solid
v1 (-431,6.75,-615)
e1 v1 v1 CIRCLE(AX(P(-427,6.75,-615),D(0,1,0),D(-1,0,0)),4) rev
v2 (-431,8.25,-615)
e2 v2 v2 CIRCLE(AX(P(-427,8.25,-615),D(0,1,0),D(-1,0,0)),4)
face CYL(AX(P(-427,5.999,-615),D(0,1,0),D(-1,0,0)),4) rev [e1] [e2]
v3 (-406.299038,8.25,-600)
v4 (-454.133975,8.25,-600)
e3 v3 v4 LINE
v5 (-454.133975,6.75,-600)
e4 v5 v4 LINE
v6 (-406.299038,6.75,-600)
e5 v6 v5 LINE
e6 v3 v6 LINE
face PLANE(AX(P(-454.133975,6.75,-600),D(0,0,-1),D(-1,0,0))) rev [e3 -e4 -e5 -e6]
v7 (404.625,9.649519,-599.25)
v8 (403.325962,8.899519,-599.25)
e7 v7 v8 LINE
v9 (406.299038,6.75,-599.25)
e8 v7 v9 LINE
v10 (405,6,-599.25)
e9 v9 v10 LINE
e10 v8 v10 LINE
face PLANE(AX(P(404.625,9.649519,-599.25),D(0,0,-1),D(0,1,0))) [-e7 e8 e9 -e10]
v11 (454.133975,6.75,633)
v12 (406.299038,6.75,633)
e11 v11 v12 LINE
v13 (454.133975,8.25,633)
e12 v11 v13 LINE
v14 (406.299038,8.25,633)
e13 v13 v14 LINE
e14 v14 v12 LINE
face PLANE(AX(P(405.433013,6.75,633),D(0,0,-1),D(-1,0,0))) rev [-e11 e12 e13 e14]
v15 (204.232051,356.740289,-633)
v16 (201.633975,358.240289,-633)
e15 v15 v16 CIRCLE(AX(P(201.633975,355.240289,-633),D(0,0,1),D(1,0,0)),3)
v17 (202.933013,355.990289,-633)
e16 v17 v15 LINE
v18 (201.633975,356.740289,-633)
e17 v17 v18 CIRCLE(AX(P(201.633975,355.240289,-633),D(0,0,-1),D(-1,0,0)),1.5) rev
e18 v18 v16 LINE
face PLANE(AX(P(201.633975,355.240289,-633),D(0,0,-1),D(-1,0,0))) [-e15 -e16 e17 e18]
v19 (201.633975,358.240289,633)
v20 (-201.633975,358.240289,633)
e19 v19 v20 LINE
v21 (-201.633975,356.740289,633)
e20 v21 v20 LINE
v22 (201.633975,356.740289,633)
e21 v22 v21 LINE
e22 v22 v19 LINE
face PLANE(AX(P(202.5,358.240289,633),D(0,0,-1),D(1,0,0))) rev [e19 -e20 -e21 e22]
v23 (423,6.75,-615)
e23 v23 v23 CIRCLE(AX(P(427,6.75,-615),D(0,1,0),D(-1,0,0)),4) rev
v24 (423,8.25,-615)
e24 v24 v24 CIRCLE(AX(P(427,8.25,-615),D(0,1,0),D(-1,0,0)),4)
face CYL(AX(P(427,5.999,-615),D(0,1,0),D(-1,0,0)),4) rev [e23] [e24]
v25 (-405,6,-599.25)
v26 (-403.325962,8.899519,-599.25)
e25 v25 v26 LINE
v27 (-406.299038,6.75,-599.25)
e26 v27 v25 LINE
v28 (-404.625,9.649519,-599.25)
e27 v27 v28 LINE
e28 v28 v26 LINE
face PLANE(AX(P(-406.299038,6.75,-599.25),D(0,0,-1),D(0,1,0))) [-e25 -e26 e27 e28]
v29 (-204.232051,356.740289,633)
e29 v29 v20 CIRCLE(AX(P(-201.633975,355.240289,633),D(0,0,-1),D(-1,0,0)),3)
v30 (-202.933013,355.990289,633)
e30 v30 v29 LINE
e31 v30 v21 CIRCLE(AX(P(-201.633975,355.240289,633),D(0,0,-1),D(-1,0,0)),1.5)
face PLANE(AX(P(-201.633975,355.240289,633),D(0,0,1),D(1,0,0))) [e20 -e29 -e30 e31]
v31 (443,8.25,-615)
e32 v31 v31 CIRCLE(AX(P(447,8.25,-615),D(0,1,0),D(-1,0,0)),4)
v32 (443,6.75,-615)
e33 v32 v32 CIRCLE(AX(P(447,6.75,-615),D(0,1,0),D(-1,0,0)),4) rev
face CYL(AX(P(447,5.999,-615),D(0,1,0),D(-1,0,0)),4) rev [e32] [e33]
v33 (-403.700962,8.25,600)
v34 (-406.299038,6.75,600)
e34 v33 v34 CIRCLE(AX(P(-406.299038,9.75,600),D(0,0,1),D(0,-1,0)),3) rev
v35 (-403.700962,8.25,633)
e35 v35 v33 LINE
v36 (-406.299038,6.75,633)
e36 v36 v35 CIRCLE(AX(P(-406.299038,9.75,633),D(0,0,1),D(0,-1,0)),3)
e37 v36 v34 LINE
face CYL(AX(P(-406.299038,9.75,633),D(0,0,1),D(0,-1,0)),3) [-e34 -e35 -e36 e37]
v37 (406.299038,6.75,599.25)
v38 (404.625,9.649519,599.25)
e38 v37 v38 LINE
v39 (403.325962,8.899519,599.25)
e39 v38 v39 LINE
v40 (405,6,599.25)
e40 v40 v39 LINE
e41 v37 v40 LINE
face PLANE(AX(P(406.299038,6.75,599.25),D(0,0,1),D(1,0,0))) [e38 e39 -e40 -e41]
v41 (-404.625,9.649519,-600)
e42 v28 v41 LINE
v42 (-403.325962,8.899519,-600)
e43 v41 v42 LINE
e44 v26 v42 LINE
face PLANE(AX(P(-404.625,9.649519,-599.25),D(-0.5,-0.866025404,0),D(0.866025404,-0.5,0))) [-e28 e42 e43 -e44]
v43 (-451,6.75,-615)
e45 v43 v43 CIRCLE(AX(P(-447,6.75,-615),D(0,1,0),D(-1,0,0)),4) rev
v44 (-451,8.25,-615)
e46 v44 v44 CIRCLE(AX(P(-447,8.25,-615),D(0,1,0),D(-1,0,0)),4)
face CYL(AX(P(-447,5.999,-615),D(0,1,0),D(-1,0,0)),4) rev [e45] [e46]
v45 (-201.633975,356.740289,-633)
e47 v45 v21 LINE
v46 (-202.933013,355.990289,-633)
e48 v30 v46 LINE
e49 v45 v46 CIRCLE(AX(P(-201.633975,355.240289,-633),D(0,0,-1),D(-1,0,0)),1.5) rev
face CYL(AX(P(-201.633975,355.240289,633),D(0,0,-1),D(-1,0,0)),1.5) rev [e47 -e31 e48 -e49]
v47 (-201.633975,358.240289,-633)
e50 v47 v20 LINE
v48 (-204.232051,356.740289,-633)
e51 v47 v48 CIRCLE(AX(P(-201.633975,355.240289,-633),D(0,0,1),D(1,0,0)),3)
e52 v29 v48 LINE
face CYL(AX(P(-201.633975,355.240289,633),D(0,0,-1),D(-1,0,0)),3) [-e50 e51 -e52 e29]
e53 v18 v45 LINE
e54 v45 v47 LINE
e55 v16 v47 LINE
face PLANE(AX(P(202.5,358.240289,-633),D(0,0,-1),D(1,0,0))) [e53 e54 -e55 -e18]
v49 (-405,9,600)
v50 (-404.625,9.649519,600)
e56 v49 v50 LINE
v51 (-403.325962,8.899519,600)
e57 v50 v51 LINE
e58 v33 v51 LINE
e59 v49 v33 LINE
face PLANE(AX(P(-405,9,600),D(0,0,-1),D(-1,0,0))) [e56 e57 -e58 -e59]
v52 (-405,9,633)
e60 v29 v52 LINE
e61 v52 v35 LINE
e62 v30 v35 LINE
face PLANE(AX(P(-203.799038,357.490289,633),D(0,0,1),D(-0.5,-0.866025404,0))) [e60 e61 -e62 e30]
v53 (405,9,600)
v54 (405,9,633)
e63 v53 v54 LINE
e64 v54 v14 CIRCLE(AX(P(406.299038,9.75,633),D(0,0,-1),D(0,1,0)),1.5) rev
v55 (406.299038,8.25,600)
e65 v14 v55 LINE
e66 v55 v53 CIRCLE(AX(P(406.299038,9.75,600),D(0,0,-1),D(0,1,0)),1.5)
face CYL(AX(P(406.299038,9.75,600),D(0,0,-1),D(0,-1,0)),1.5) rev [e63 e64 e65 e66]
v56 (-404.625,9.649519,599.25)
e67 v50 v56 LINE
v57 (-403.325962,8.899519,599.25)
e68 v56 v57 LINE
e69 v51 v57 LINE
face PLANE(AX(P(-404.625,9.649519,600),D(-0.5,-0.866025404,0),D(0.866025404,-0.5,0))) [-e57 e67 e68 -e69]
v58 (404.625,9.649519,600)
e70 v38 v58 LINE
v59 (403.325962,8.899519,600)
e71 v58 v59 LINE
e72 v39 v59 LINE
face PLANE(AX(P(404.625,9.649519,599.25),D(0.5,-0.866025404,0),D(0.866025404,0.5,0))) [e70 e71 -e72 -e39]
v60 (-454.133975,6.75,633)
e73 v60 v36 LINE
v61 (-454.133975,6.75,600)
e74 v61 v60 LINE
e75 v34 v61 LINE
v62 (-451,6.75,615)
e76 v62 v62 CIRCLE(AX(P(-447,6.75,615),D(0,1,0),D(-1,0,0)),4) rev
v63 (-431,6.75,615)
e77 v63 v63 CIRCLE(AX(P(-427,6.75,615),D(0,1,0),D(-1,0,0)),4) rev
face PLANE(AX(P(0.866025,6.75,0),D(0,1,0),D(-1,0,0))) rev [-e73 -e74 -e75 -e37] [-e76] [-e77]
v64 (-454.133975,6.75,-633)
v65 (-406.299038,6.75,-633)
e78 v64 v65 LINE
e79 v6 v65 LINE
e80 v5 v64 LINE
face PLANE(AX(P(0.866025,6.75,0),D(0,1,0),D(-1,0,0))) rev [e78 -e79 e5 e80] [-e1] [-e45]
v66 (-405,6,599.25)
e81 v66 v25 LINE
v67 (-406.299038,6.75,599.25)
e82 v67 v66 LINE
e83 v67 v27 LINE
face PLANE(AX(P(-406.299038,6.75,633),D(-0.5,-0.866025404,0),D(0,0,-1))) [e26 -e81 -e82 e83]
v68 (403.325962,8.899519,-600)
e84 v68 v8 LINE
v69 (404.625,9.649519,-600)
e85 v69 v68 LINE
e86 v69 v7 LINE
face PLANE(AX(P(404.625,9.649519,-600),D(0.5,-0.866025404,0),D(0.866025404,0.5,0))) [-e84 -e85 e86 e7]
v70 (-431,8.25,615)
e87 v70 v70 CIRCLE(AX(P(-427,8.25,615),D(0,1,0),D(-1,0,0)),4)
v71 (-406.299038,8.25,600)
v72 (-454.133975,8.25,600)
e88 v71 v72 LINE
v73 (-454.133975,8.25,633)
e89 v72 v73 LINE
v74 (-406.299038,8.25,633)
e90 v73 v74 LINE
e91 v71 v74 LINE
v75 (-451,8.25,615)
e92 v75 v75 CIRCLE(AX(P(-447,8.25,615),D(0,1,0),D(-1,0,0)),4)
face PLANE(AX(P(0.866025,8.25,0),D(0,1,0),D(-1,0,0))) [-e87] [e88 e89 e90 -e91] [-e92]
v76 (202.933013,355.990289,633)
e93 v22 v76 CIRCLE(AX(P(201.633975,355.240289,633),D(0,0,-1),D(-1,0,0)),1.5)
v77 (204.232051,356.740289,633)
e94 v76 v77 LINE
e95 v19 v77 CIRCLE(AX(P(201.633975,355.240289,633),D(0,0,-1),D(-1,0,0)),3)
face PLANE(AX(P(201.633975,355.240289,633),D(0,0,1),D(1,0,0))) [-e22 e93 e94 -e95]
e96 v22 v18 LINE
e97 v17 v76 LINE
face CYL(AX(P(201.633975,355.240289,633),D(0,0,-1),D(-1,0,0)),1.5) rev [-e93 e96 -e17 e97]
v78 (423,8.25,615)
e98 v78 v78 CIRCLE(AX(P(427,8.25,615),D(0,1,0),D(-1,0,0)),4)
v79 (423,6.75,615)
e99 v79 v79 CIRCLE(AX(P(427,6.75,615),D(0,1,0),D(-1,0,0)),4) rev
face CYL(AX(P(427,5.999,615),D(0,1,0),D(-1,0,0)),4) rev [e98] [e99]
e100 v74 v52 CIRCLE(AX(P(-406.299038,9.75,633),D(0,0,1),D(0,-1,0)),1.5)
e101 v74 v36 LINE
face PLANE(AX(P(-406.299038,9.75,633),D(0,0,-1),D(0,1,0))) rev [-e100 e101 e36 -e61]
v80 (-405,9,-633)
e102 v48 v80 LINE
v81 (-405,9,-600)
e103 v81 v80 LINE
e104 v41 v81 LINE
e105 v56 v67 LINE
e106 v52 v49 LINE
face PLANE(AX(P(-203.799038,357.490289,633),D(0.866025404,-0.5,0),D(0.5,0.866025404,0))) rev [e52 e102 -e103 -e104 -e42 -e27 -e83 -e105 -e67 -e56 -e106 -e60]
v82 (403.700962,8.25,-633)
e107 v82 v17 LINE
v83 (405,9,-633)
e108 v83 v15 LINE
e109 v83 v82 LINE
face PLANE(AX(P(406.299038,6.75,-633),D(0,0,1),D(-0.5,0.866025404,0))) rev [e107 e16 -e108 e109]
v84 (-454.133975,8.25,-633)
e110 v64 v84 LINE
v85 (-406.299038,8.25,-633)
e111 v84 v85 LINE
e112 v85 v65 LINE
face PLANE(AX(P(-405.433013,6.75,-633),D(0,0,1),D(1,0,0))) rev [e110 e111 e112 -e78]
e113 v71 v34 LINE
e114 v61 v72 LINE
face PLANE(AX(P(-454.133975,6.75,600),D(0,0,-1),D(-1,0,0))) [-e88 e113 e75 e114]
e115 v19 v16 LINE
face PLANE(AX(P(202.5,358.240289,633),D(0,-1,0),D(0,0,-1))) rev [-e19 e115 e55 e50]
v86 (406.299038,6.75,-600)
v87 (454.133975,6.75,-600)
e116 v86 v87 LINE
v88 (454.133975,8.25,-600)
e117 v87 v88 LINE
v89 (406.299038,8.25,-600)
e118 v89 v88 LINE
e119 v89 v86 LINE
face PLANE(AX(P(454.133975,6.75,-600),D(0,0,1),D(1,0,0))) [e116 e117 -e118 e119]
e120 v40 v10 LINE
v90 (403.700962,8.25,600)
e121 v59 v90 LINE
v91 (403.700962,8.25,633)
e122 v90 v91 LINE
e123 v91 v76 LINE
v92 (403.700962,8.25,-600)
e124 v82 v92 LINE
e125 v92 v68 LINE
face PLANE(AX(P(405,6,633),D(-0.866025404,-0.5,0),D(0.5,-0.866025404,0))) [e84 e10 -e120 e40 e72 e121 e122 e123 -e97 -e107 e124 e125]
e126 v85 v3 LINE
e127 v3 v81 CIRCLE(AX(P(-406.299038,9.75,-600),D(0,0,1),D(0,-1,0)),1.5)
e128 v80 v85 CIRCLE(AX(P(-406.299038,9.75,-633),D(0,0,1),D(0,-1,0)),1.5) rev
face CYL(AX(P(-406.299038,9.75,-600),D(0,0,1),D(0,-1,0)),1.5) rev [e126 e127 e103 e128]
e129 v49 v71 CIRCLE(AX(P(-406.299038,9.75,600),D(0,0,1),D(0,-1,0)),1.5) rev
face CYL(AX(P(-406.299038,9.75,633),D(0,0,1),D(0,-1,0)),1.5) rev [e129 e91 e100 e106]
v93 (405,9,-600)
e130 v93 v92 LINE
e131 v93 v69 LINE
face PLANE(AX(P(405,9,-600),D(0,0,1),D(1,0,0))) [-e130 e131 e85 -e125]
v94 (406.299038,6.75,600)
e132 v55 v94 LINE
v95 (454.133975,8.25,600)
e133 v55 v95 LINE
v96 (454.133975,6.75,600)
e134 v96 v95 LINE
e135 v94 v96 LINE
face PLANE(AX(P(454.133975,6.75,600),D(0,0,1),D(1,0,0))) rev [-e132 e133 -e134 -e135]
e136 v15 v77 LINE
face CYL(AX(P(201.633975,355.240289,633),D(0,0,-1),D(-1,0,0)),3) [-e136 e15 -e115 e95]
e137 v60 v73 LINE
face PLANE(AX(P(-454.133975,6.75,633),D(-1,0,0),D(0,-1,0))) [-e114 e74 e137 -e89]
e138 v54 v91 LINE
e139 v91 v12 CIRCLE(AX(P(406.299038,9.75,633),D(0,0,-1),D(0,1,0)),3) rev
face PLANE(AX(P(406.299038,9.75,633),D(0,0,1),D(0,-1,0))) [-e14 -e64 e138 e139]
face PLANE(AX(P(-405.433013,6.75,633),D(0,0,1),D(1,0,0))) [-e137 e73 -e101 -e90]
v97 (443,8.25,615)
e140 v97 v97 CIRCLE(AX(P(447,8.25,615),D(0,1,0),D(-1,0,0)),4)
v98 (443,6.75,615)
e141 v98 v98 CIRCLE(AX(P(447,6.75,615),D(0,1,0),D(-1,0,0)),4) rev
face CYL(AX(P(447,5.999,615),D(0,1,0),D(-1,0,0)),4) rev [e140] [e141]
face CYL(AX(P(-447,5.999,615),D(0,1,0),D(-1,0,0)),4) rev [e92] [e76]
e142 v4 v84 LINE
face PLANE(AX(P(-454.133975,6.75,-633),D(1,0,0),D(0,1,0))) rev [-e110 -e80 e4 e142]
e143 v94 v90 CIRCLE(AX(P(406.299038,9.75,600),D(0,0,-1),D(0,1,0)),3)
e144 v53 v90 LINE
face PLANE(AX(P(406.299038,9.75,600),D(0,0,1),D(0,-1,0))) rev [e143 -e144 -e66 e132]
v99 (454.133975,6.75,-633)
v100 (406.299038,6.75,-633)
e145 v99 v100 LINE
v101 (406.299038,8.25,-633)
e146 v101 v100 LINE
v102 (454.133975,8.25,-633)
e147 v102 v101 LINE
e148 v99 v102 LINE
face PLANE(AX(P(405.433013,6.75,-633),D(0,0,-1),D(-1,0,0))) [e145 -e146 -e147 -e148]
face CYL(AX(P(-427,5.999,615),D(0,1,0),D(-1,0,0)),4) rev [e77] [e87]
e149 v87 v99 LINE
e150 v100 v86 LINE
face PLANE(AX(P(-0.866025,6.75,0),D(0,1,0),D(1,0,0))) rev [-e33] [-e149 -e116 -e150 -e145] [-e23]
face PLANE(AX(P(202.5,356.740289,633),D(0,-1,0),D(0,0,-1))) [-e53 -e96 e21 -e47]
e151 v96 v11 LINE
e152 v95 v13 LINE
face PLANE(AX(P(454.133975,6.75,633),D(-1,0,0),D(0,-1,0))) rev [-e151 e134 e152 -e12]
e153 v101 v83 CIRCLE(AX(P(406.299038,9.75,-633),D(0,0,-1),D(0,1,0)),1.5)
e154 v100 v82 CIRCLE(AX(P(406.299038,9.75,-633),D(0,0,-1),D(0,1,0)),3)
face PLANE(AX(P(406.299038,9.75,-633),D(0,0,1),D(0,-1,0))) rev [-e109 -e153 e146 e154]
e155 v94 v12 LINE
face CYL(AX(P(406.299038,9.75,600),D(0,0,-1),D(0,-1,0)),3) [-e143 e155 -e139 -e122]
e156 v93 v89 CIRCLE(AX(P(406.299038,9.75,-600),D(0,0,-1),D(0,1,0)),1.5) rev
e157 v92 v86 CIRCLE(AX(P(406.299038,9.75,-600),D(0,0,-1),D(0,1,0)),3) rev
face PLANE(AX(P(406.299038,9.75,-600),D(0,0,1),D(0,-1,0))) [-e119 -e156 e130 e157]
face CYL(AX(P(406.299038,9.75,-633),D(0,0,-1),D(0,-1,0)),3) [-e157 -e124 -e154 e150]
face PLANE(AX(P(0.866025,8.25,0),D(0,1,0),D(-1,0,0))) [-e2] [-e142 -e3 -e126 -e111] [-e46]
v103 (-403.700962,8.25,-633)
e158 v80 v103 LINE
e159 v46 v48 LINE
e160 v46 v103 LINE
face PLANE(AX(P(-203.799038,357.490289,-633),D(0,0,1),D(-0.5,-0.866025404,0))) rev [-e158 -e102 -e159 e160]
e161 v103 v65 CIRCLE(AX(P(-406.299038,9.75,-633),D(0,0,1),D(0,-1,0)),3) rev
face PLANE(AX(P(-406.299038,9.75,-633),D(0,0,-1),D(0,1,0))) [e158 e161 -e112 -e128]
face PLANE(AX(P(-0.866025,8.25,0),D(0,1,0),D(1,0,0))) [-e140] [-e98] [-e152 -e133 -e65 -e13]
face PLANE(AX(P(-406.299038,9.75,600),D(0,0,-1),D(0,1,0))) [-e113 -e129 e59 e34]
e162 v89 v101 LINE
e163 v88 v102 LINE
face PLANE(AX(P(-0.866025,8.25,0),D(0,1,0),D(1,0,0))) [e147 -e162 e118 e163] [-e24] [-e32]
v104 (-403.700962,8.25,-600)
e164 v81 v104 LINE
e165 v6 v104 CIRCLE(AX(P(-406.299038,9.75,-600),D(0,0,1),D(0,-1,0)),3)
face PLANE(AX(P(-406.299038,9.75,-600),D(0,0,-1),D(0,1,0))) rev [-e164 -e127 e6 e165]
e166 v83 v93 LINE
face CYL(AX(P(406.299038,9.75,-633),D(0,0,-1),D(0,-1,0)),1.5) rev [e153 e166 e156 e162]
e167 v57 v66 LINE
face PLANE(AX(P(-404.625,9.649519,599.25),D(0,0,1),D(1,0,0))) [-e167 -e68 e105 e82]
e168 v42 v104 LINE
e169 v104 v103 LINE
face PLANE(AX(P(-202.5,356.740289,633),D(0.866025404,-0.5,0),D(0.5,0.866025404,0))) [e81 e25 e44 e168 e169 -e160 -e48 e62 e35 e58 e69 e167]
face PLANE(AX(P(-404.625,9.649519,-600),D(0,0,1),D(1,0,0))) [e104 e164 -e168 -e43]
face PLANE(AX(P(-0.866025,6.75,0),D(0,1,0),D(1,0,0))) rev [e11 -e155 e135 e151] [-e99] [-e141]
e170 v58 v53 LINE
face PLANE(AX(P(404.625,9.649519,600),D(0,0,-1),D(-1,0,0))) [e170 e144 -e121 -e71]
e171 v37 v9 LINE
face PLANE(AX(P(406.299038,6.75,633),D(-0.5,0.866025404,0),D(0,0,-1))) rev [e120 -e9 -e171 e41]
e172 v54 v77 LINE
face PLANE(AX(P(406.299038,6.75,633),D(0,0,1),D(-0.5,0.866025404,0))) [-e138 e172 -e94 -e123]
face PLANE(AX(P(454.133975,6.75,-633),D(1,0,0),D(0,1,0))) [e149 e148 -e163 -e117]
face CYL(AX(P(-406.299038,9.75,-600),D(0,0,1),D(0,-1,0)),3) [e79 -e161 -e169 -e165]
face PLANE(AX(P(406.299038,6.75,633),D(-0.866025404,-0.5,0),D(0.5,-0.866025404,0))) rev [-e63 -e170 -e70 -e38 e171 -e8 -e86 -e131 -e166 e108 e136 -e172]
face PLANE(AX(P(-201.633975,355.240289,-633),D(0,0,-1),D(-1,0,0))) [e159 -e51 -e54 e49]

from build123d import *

# Parameters (mm, degrees)
EXTRUDE_1_DEPTH          = 633
EXTRUDE_1_DEPTH_BACK     = 633
SHEET_START              = -633
SHEET_METAL_1_DEPTH      = 1266
SHEET_METAL_1_2_DEPTH    = 1266
SM_START                 = -633
SM_EDGE_FLANGE_1_DEPTH   = 33.75
SM_START_2               = -600
SM_EDGE_FLANGE_1_2_DEPTH = 0.75
SM_EDGE_FLANGE_1_3_DEPTH = 33
MIRROR_START             = -633
MIRROR_2_COPY_1_DEPTH    = 33.75
MIRROR_START_2           = -600
MIRROR_2_COPY_2_DEPTH    = 0.75
MIRROR_2_COPY_3_DEPTH    = 33
MIRROR_2_COPY_4_DEPTH    = 0.75
MIRROR_2_COPY_5_DEPTH    = 33
CUT_EXTRUDE_1_REACH      = 856.061
SKETCH_9_R               = 4


# Read off the part's stored shape, not the designer's step: Преобразовать-Твердое тело1, Ребро-кромка1
with BuildPart() as part:
    # Sketch 1 → Вытянуть-Тонкостенный1 (new, two sides: drawn at the far end of the back side and taken through both)
    with BuildSketch(Plane.XY.offset(-EXTRUDE_1_DEPTH_BACK)):
        Polygon((405, 6), (202.5, 356.740288533), (-202.5, 356.740288533), (-405, 6), (-406.299038106, 6.75), (-203.366025404, 358.240288533), (203.366025404, 358.240288533), (406.299038106, 6.75), align=None)
    extrude(amount=EXTRUDE_1_DEPTH + EXTRUDE_1_DEPTH_BACK)

    # Sheet Metal 1 outline → Sheet Metal 1 (cut)
    with BuildSketch(Plane.XY.offset(SHEET_START)):
        with BuildLine():
            Line((203.366025404, 358.240288533), (201.633974596, 358.240288533))
            ThreePointArc((201.633974596, 358.240288533), (203.133974596, 357.838364744), (204.232050808, 356.740288533))
            Line((204.232050808, 356.740288533), (203.366025404, 358.240288533))
        make_face()
        with BuildLine():
            ThreePointArc((-204.232050808, 356.740288533), (-203.133974596, 357.838364744), (-201.633974596, 358.240288533))
            Line((-201.633974596, 358.240288533), (-203.366025404, 358.240288533))
            Line((-203.366025404, 358.240288533), (-204.232050808, 356.740288533))
        make_face()
    extrude(amount=SHEET_METAL_1_DEPTH, mode=Mode.SUBTRACT)

    # Sheet Metal 1 2 outline → Sheet Metal 1 2 (add)
    with BuildSketch(Plane.XY.offset(SHEET_START)):
        with BuildLine():
            Line((202.5, 356.740288533), (201.633974596, 356.740288533))
            ThreePointArc((201.633974596, 356.740288533), (202.383974596, 356.539326638), (202.933012702, 355.990288533))
            Line((202.933012702, 355.990288533), (202.5, 356.740288533))
        make_face()
        with BuildLine():
            ThreePointArc((-202.933012702, 355.990288533), (-202.383974596, 356.539326638), (-201.633974596, 356.740288533))
            Line((-201.633974596, 356.740288533), (-202.5, 356.740288533))
            Line((-202.5, 356.740288533), (-202.933012702, 355.990288533))
        make_face()
    extrude(amount=SHEET_METAL_1_2_DEPTH)

    # Ребро-кромка1 outline → Ребро-кромка1 (cut)
    with BuildSketch(Plane.XY.offset(SM_START)):
        with BuildLine():
            Line((-405, 6), (-403.700961894, 8.25))
            ThreePointArc((-403.700961894, 8.25), (-404.799038106, 7.151923789), (-406.299038106, 6.75))
            Line((-406.299038106, 6.75), (-405, 6))
        make_face()
    sm_edge_flange_1 = extrude(amount=SM_EDGE_FLANGE_1_DEPTH, mode=Mode.SUBTRACT)

    # Sm Edge Flange 1 2 outline → Sm Edge Flange 1 2 (cut)
    with BuildSketch(Plane.XY.offset(SM_START_2)):
        with BuildLine():
            Line((-403.325961894, 8.899519053), (-404.625, 9.649519053))
            Line((-404.625, 9.649519053), (-406.299038106, 6.75))
            ThreePointArc((-406.299038106, 6.75), (-404.799038106, 7.151923789), (-403.700961894, 8.25))
            Line((-403.700961894, 8.25), (-403.325961894, 8.899519053))
        make_face()
    sm_edge_flange_1_2 = extrude(amount=SM_EDGE_FLANGE_1_2_DEPTH, mode=Mode.SUBTRACT)

    # Sm Edge Flange 1 3 outline → Sm Edge Flange 1 3 (add)
    with BuildSketch(Plane.XY.offset(SM_START)):
        with BuildLine():
            Line((-406.299038106, 6.75), (-405, 9))
            ThreePointArc((-405, 9), (-405.549038106, 8.450961894), (-406.299038106, 8.25))
            Line((-406.299038106, 8.25), (-454.133974596, 8.25))
            Line((-454.133974596, 8.25), (-454.133974596, 6.75))
            Line((-454.133974596, 6.75), (-406.299038106, 6.75))
        make_face()
    sm_edge_flange_1_3 = extrude(amount=SM_EDGE_FLANGE_1_3_DEPTH)

    # Зеркальное отражение1: Ребро-кромка1, Sm Edge Flange 1 2, Sm Edge Flange 1 3 across plane
    add(sm_edge_flange_1.mirror(Plane.XY), mode=Mode.SUBTRACT)
    add(sm_edge_flange_1_2.mirror(Plane.XY), mode=Mode.SUBTRACT)
    add(sm_edge_flange_1_3.mirror(Plane.XY))

    # Зеркальное отражение2: Ребро-кромка1, Sm Edge Flange 1 2, Sm Edge Flange 1 3 across plane
    add(sm_edge_flange_1.mirror(Plane(origin=(0, 0, 0), x_dir=(0, 0, 1), z_dir=(1, 0, 0))), mode=Mode.SUBTRACT)
    add(sm_edge_flange_1_2.mirror(Plane(origin=(0, 0, 0), x_dir=(0, 0, 1), z_dir=(1, 0, 0))), mode=Mode.SUBTRACT)
    add(sm_edge_flange_1_3.mirror(Plane(origin=(0, 0, 0), x_dir=(0, 0, 1), z_dir=(1, 0, 0))))

    # Зеркальное отражение2 copy 1 sketch → Зеркальное отражение2 copy 1 (cut)
    with BuildSketch(Plane(origin=(0, 0, 0), x_dir=(-1, 0, 0), z_dir=(0, 0, -1)).offset(MIRROR_START)):
        with BuildLine():
            Line((-405, 6), (-403.700961894, 8.25))
            ThreePointArc((-403.700961894, 8.25), (-404.799038106, 7.151923789), (-406.299038106, 6.75))
            Line((-406.299038106, 6.75), (-405, 6))
        make_face()
    extrude(amount=MIRROR_2_COPY_1_DEPTH, mode=Mode.SUBTRACT)

    # Зеркальное отражение2 copy 2 sketch → Зеркальное отражение2 copy 2 (cut)
    with BuildSketch(Plane(origin=(0, 0, 0), x_dir=(-1, 0, 0), z_dir=(0, 0, -1)).offset(MIRROR_START_2)):
        with BuildLine():
            Line((-403.325961894, 8.899519053), (-404.625, 9.649519053))
            Line((-404.625, 9.649519053), (-406.299038106, 6.75))
            ThreePointArc((-406.299038106, 6.75), (-404.799038106, 7.151923789), (-403.700961894, 8.25))
            Line((-403.700961894, 8.25), (-403.325961894, 8.899519053))
        make_face()
    extrude(amount=MIRROR_2_COPY_2_DEPTH, mode=Mode.SUBTRACT)

    # Зеркальное отражение2 copy 3 sketch → Зеркальное отражение2 copy 3 (add)
    with BuildSketch(Plane(origin=(0, 0, 0), x_dir=(-1, 0, 0), z_dir=(0, 0, -1)).offset(MIRROR_START)):
        with BuildLine():
            Line((-406.299038106, 6.75), (-405, 9))
            ThreePointArc((-405, 9), (-405.549038106, 8.450961894), (-406.299038106, 8.25))
            Line((-406.299038106, 8.25), (-454.133974596, 8.25))
            Line((-454.133974596, 8.25), (-454.133974596, 6.75))
            Line((-454.133974596, 6.75), (-406.299038106, 6.75))
        make_face()
    extrude(amount=MIRROR_2_COPY_3_DEPTH)

    # Зеркальное отражение2 copy 4 sketch → Зеркальное отражение2 copy 4 (cut)
    with BuildSketch(Plane(origin=(0, 0, 0), x_dir=(-1, 0, 0), z_dir=(0, 0, 1)).offset(MIRROR_START_2)):
        with BuildLine():
            Line((-403.325961894, -8.899519053), (-404.625, -9.649519053))
            Line((-404.625, -9.649519053), (-406.299038106, -6.75))
            ThreePointArc((-406.299038106, -6.75), (-404.799038106, -7.151923789), (-403.700961894, -8.25))
            Line((-403.700961894, -8.25), (-403.325961894, -8.899519053))
        make_face()
    extrude(amount=MIRROR_2_COPY_4_DEPTH, mode=Mode.SUBTRACT)

    # Зеркальное отражение2 copy 5 sketch → Зеркальное отражение2 copy 5 (add)
    with BuildSketch(Plane(origin=(0, 0, 0), x_dir=(-1, 0, 0), z_dir=(0, 0, 1)).offset(MIRROR_START)):
        with BuildLine():
            Line((-406.299038106, -6.75), (-405, -9))
            ThreePointArc((-405, -9), (-405.549038106, -8.450961894), (-406.299038106, -8.25))
            Line((-406.299038106, -8.25), (-454.133974596, -8.25))
            Line((-454.133974596, -8.25), (-454.133974596, -6.75))
            Line((-454.133974596, -6.75), (-406.299038106, -6.75))
        make_face()
    extrude(amount=MIRROR_2_COPY_5_DEPTH)

    # Эскиз9 → Вырез-Вытянуть1 (cut, up to next)
    with BuildSketch(Plane(origin=(0, 8.25, 0), x_dir=(1, 0, 0), z_dir=(0, 1, 0)), mode=Mode.PRIVATE) as cut_extrude_1_sk1:
        with Locations(Location((-447, 615, 0), (0, 0, 180))):
            Circle(SKETCH_9_R)
    cut_extrude_1_tool1 = extrude(cut_extrude_1_sk1.sketch, amount=-CUT_EXTRUDE_1_REACH, mode=Mode.PRIVATE) & part.part
    # Эскиз9 → Вырез-Вытянуть1 (cut, up to next)
    with BuildSketch(Plane(origin=(0, 8.25, 0), x_dir=(1, 0, 0), z_dir=(0, 1, 0)), mode=Mode.PRIVATE) as cut_extrude_1_sk2:
        with Locations(Location((-427, 615, 0), (0, 0, 180))):
            Circle(SKETCH_9_R)
    cut_extrude_1_tool2 = extrude(cut_extrude_1_sk2.sketch, amount=-CUT_EXTRUDE_1_REACH, mode=Mode.PRIVATE) & part.part
    # Эскиз9 → Вырез-Вытянуть1 (cut, up to next)
    with BuildSketch(Plane(origin=(0, 8.25, 0), x_dir=(1, 0, 0), z_dir=(0, 1, 0)), mode=Mode.PRIVATE) as cut_extrude_1_sk3:
        with Locations(Location((-447, -615, 0), (0, 0, 180))):
            Circle(SKETCH_9_R)
    cut_extrude_1_tool3 = extrude(cut_extrude_1_sk3.sketch, amount=-CUT_EXTRUDE_1_REACH, mode=Mode.PRIVATE) & part.part
    # Эскиз9 → Вырез-Вытянуть1 (cut, up to next)
    with BuildSketch(Plane(origin=(0, 8.25, 0), x_dir=(1, 0, 0), z_dir=(0, 1, 0)), mode=Mode.PRIVATE) as cut_extrude_1_sk4:
        with Locations(Location((-427, -615, 0), (0, 0, 180))):
            Circle(SKETCH_9_R)
    cut_extrude_1_tool4 = extrude(cut_extrude_1_sk4.sketch, amount=-CUT_EXTRUDE_1_REACH, mode=Mode.PRIVATE) & part.part
    # Эскиз9 → Вырез-Вытянуть1 (cut, up to next)
    with BuildSketch(Plane(origin=(0, 8.25, 0), x_dir=(1, 0, 0), z_dir=(0, 1, 0)), mode=Mode.PRIVATE) as cut_extrude_1_sk5:
        with Locations(Location((427, -615, 0), (0, 0, 180))):
            Circle(SKETCH_9_R)
    cut_extrude_1_tool5 = extrude(cut_extrude_1_sk5.sketch, amount=-CUT_EXTRUDE_1_REACH, mode=Mode.PRIVATE) & part.part
    # Эскиз9 → Вырез-Вытянуть1 (cut, up to next)
    with BuildSketch(Plane(origin=(0, 8.25, 0), x_dir=(1, 0, 0), z_dir=(0, 1, 0)), mode=Mode.PRIVATE) as cut_extrude_1_sk6:
        with Locations(Location((447, -615, 0), (0, 0, 180))):
            Circle(SKETCH_9_R)
    cut_extrude_1_tool6 = extrude(cut_extrude_1_sk6.sketch, amount=-CUT_EXTRUDE_1_REACH, mode=Mode.PRIVATE) & part.part
    # Эскиз9 → Вырез-Вытянуть1 (cut, up to next)
    with BuildSketch(Plane(origin=(0, 8.25, 0), x_dir=(1, 0, 0), z_dir=(0, 1, 0)), mode=Mode.PRIVATE) as cut_extrude_1_sk7:
        with Locations(Location((427, 615, 0), (0, 0, 180))):
            Circle(SKETCH_9_R)
    cut_extrude_1_tool7 = extrude(cut_extrude_1_sk7.sketch, amount=-CUT_EXTRUDE_1_REACH, mode=Mode.PRIVATE) & part.part
    # Эскиз9 → Вырез-Вытянуть1 (cut, up to next)
    with BuildSketch(Plane(origin=(0, 8.25, 0), x_dir=(1, 0, 0), z_dir=(0, 1, 0)), mode=Mode.PRIVATE) as cut_extrude_1_sk8:
        with Locations(Location((447, 615, 0), (0, 0, 180))):
            Circle(SKETCH_9_R)
    cut_extrude_1_tool8 = extrude(cut_extrude_1_sk8.sketch, amount=-CUT_EXTRUDE_1_REACH, mode=Mode.PRIVATE) & part.part
    add(cut_extrude_1_tool1.solids().sort_by_distance((-447, 8.25, -615))[0], mode=Mode.SUBTRACT)
    add(cut_extrude_1_tool2.solids().sort_by_distance((-427, 8.25, -615))[0], mode=Mode.SUBTRACT)
    add(cut_extrude_1_tool3.solids().sort_by_distance((-447, 8.25, 615))[0], mode=Mode.SUBTRACT)
    add(cut_extrude_1_tool4.solids().sort_by_distance((-427, 8.25, 615))[0], mode=Mode.SUBTRACT)
    add(cut_extrude_1_tool5.solids().sort_by_distance((427, 8.25, 615))[0], mode=Mode.SUBTRACT)
    add(cut_extrude_1_tool6.solids().sort_by_distance((447, 8.25, 615))[0], mode=Mode.SUBTRACT)
    add(cut_extrude_1_tool7.solids().sort_by_distance((427, 8.25, -615))[0], mode=Mode.SUBTRACT)
    add(cut_extrude_1_tool8.solids().sort_by_distance((447, 8.25, -615))[0], mode=Mode.SUBTRACT)


solid = part.part
